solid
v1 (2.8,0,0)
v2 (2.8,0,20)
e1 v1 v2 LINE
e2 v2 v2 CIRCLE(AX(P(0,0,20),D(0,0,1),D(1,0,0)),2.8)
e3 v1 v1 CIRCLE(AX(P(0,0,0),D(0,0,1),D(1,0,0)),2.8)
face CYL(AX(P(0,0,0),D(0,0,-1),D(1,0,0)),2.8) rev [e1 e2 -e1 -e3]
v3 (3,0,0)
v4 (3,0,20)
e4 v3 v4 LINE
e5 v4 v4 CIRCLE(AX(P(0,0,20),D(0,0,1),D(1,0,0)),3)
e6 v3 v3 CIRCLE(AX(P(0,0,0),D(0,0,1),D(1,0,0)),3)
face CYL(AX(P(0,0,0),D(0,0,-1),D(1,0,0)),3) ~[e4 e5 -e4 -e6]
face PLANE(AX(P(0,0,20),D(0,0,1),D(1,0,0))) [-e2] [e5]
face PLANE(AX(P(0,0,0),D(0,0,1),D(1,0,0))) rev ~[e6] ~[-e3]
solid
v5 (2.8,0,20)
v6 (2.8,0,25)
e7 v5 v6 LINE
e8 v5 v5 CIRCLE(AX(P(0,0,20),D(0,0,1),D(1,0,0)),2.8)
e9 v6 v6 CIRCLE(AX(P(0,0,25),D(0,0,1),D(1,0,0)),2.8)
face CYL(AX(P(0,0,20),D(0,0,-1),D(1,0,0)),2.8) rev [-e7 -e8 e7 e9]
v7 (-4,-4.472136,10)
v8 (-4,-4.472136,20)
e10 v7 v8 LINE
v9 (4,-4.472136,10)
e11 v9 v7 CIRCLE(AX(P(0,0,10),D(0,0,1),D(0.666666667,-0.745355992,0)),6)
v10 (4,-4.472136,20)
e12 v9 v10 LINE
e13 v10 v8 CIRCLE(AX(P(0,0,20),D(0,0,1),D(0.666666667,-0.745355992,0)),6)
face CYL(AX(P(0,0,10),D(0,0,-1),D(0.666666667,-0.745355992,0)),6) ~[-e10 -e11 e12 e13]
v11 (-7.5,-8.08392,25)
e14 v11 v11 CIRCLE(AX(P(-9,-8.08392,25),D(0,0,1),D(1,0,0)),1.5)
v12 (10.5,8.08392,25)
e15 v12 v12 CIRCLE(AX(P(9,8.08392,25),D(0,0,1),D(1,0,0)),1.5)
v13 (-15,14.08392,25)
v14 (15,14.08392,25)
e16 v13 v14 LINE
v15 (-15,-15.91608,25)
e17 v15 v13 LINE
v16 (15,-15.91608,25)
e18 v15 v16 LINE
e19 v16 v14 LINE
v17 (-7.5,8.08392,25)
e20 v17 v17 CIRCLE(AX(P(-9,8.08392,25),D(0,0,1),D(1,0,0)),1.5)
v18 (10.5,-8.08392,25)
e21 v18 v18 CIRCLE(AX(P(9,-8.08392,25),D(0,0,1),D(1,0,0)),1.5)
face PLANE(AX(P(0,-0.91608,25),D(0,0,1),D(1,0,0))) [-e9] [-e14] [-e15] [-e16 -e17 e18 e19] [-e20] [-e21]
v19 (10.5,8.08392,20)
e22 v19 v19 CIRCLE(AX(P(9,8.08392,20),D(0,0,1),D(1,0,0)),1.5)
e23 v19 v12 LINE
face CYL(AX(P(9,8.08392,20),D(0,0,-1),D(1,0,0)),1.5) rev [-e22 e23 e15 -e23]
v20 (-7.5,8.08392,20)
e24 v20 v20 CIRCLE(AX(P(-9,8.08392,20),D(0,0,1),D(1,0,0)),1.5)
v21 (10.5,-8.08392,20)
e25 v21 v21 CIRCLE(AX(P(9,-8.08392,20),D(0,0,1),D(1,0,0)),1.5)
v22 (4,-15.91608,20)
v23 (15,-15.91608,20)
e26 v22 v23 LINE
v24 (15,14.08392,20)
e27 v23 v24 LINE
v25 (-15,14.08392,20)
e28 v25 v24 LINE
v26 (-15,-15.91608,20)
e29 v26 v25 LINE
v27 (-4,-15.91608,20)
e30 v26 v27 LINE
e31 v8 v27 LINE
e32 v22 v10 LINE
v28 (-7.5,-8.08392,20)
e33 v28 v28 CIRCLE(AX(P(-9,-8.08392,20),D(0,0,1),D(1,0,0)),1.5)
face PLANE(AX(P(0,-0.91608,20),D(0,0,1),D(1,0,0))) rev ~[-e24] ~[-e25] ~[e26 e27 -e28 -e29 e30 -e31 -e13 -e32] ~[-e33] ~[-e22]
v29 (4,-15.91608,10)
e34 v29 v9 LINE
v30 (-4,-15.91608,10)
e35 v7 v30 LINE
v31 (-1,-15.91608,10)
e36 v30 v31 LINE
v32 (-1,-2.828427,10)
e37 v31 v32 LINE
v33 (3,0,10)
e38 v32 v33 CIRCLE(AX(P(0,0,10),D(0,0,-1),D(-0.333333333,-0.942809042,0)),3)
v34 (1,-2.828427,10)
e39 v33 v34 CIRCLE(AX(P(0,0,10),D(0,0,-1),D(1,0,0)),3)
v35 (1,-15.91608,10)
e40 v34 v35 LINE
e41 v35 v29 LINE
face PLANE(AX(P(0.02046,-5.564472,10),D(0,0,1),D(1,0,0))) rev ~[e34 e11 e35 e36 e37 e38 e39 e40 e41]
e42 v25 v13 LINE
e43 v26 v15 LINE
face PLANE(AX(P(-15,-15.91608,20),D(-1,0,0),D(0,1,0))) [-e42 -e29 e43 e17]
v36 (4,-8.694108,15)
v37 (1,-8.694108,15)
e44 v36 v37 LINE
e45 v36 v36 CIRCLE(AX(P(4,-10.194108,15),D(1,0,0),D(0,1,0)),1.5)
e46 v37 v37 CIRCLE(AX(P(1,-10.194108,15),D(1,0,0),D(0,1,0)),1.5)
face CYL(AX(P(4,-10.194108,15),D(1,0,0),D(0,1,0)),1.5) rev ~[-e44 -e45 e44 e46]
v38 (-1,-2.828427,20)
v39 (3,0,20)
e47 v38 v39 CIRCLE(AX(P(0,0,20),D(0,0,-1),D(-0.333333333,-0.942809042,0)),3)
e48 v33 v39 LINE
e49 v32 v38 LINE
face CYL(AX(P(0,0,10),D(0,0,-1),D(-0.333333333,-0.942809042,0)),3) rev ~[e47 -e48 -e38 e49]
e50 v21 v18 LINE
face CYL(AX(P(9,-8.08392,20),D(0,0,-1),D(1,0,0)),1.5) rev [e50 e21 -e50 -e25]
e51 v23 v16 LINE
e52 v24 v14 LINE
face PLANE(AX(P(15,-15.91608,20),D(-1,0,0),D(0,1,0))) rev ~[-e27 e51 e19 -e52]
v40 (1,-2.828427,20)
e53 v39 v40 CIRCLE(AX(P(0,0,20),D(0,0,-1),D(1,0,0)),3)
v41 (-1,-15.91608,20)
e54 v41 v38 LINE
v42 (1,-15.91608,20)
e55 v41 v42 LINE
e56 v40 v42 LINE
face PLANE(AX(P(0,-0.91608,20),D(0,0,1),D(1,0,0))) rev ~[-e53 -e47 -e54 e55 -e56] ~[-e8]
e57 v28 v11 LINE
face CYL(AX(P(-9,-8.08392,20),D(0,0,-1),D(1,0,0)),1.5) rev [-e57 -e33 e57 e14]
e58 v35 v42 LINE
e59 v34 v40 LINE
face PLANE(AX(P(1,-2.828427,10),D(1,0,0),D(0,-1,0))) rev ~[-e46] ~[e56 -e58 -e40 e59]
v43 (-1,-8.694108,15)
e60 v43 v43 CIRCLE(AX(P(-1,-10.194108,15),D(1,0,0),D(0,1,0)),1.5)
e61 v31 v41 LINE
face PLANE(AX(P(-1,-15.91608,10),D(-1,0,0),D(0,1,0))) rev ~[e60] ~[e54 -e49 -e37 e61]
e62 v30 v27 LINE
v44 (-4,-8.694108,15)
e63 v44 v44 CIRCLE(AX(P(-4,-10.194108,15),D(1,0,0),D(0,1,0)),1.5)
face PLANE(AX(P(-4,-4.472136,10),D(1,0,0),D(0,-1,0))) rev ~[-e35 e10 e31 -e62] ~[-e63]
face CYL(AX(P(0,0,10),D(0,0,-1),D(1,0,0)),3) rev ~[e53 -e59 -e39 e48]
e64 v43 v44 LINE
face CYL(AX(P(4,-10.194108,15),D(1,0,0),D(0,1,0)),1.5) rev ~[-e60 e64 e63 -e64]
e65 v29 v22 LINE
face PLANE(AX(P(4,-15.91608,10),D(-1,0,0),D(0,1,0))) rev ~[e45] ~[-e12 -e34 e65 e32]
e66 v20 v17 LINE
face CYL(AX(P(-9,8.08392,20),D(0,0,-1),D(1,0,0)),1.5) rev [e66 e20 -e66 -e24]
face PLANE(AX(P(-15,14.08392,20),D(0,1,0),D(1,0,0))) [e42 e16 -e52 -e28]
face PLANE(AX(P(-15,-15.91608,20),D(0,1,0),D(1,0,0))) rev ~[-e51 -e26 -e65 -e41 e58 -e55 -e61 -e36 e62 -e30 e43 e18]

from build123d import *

# Parameters (mm, degrees)
F0_R     = 3
F0_R_2   = 2.8
F1_DEPTH = 20
F4_DEPTH = 10
F5_R     = 1.5
F6_DEPTH = 10.001
F7_W     = 30
F7_H     = 30
F7_R     = 1.5
F7_R_2   = 2.8
F8_DEPTH = 5


with BuildPart() as f1:
    # F0 (on Top) → F1 (new body)
    with BuildSketch(Plane.XY):
        Circle(F0_R)
        Circle(F0_R_2, mode=Mode.SUBTRACT)
    extrude(amount=F1_DEPTH)


with BuildPart() as f4:
    # F3 (on offset) → F4 (new body)
    with BuildSketch(Plane.XY.offset(10)):
        with BuildLine():
            ThreePointArc((-1, -2.8284271247), (-1.7320508076, 2.4494897428), (3, 0))
            ThreePointArc((3, 0), (2.4494897428, -1.7320508076), (1, -2.8284271247))
            Line((1, -2.8284271247), (1, -5.9160797831))
            Line((1, -5.9160797831), (1, -15.9160797831))
            Line((1, -15.9160797831), (4, -15.9160797831))
            Line((4, -15.9160797831), (4, -4.472135955))
            ThreePointArc((4, -4.472135955), (0, 6), (-4, -4.472135955))
            Line((-4, -4.472135955), (-4, -15.9160797831))
            Line((-4, -15.9160797831), (-1, -15.9160797831))
            Line((-1, -15.9160797831), (-1, -5.9160797831))
            Line((-1, -5.9160797831), (-1, -2.8284271247))
        make_face()
    extrude(amount=F4_DEPTH)

    # F5 (on face) → F6 (cut, through all)
    with BuildSketch(Plane.YZ.offset(4)):
        with Locations((-10.194107869, 15)):
            Circle(F5_R)
    extrude(amount=-F6_DEPTH, mode=Mode.SUBTRACT)

    # F7 (on face) → F8 (join)
    with BuildSketch(Plane.XY.offset(20)):
        with Locations((0, -0.9160797831)):
            Rectangle(F7_W, F7_H)
        with Locations((-9, -8.0839202169)):
            Circle(F7_R, mode=Mode.SUBTRACT)
        with Locations((9, -8.0839202169)):
            Circle(F7_R, mode=Mode.SUBTRACT)
        with Locations((-9, 8.0839202169)):
            Circle(F7_R, mode=Mode.SUBTRACT)
        Circle(F7_R_2, mode=Mode.SUBTRACT)
        with Locations((9, 8.0839202169)):
            Circle(F7_R, mode=Mode.SUBTRACT)
    extrude(amount=F8_DEPTH)


solid = Compound([f1.part, f4.part])
